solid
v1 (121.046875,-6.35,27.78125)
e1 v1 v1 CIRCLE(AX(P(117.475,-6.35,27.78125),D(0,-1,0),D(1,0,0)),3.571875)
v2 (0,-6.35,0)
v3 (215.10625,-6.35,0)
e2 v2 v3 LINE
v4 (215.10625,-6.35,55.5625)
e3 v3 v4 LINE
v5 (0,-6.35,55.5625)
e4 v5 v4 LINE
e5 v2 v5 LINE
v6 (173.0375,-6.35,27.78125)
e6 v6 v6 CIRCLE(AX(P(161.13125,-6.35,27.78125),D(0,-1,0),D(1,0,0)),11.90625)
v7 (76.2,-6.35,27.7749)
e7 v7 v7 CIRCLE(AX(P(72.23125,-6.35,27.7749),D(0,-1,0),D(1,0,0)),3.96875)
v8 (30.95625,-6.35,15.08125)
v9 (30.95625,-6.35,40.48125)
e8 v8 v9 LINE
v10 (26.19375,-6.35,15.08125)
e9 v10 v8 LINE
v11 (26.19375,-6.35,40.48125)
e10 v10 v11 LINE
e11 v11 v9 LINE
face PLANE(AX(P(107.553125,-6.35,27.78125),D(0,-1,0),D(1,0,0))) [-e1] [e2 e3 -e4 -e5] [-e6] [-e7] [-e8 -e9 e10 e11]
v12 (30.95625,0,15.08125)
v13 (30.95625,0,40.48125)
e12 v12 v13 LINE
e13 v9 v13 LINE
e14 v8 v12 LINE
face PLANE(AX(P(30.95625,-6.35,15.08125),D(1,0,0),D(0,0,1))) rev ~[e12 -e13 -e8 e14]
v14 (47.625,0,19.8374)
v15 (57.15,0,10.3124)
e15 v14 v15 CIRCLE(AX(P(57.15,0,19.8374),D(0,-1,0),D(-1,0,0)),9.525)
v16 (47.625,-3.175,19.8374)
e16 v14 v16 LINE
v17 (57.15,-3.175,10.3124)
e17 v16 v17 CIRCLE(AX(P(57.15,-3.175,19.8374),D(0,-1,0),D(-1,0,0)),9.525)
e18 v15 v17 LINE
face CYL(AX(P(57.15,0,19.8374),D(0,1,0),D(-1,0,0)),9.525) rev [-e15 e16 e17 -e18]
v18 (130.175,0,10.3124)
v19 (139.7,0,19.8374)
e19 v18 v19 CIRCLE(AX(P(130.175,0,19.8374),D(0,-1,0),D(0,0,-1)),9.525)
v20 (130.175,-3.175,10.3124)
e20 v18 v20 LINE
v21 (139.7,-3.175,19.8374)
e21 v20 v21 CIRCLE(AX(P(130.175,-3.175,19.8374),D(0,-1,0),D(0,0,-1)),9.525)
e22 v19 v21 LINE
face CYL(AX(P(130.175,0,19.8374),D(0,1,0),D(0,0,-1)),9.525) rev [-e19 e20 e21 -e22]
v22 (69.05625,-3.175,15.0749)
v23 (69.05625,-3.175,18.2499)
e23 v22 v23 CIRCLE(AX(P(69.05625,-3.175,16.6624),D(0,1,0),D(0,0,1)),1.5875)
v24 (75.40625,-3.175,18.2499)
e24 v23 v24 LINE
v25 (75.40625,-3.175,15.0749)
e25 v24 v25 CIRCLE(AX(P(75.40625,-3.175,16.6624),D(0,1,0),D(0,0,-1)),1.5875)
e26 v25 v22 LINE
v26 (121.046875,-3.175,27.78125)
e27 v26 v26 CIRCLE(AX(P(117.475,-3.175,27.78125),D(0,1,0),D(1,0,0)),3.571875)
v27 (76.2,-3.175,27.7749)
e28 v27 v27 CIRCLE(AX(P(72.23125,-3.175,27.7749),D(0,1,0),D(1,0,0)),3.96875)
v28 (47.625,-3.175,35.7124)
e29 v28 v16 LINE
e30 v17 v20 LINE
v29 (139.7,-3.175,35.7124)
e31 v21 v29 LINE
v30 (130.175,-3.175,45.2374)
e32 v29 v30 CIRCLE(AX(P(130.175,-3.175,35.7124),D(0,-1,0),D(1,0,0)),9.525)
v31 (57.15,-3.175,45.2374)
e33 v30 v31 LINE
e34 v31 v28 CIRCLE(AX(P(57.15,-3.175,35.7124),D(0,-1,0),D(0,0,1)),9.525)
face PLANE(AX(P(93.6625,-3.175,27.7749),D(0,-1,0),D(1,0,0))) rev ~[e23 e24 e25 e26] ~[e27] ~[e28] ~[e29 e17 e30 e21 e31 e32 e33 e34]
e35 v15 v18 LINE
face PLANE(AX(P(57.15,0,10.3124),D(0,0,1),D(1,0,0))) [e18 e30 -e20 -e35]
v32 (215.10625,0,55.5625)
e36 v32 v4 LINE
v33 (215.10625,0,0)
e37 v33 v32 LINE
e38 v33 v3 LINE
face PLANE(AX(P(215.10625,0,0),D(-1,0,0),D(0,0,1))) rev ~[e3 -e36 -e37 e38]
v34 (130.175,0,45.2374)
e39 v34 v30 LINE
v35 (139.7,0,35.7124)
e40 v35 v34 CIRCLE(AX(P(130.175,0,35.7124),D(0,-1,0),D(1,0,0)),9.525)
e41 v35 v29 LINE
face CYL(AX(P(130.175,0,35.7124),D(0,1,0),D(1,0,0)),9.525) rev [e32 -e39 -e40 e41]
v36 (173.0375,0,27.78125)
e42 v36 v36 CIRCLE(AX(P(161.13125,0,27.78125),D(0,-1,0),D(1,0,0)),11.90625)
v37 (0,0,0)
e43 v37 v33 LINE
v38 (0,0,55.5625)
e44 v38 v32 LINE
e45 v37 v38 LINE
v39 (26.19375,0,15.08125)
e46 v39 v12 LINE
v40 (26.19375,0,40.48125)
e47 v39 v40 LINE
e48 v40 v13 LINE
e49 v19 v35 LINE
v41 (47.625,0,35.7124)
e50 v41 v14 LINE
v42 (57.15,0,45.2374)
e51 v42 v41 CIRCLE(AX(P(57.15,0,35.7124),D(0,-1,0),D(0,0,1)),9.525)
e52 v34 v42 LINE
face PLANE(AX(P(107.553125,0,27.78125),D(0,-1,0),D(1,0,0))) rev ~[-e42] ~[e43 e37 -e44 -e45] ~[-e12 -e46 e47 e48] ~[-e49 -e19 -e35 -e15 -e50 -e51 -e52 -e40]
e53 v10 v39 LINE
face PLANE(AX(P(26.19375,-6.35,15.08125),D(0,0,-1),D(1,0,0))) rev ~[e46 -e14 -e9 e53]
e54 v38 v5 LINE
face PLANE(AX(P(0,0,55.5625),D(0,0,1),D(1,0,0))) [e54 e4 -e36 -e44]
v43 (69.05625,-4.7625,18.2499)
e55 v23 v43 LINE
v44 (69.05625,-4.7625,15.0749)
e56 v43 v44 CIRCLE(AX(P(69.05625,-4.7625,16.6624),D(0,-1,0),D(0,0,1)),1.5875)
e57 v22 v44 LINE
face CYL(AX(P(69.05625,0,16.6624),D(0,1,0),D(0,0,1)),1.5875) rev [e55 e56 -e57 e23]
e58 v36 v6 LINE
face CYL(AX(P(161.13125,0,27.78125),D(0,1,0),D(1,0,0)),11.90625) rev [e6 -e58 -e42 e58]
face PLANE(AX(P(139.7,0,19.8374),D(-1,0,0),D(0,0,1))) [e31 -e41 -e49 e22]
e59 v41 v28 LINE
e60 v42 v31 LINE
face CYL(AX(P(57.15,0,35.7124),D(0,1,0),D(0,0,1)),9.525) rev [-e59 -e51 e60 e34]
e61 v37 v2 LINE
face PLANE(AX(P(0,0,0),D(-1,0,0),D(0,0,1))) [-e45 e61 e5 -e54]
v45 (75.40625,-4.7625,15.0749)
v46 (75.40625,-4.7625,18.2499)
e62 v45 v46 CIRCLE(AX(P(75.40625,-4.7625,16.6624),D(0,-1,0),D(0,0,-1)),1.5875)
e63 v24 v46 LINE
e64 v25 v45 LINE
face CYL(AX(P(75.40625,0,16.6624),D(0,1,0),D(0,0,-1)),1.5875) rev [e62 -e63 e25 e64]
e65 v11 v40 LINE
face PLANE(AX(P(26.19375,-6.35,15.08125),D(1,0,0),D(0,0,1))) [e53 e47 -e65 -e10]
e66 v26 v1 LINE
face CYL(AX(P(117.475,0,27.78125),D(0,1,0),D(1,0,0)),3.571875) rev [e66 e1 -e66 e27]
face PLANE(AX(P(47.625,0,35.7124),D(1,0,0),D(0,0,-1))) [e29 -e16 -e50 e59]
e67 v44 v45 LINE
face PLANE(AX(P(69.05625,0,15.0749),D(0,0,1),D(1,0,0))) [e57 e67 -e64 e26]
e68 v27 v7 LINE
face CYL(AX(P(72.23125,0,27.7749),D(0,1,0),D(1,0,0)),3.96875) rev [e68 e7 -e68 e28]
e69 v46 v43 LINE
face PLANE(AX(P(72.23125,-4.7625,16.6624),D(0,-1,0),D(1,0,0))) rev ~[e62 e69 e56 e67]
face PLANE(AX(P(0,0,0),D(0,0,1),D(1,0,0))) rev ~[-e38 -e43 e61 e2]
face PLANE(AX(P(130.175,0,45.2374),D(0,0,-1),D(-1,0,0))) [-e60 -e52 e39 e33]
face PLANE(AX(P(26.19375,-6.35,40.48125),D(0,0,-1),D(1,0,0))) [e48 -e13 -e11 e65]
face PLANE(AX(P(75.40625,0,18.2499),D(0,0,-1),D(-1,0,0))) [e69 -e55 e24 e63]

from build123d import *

# Parameters (mm, degrees)
F0_W          = 215.10625
F0_H          = 55.5625
F0_R          = 3.96875
F0_R_2        = 3.571875
F0_R_3        = 11.90625
F1_DEPTH      = 6.35
F2_W          = 4.7625
F2_H          = 25.4
F3_DEPTH      = 332
F3_DEPTH_BACK = 6.351
F5_DEPTH      = 3.175
F7_DEPTH      = 4.7625
F7_DEPTH_BACK = 3.175


# Not quite as in the source:
# - an extrude ends at something that could not be found from the text; its depth is read off the source's solid


with BuildPart() as f1:
    # F0 (on Front) → F1 (new body)
    with BuildSketch(Plane.XZ):
        with Locations((107.553125, 27.78125)):
            Rectangle(F0_W, F0_H)
        with Locations((72.23125, 27.7749)):
            Circle(F0_R, mode=Mode.SUBTRACT)
        with Locations((117.475, 27.78125)):
            Circle(F0_R_2, mode=Mode.SUBTRACT)
        with Locations((161.13125, 27.78125)):
            Circle(F0_R_3, mode=Mode.SUBTRACT)
    extrude(amount=F1_DEPTH)

    # F2 (on face) → F3 (cut, two sides)
    with BuildSketch(Plane.XZ.offset(6.35)) as f3_sk:
        with Locations((28.575, 27.78125)):
            Rectangle(F2_W, F2_H)
    extrude(amount=F3_DEPTH, mode=Mode.SUBTRACT)
    extrude(f3_sk.sketch, amount=-F3_DEPTH_BACK, mode=Mode.SUBTRACT)

    # F4 (on face) → F5 (cut)
    with BuildSketch(Plane.XZ):
        with BuildLine():
            Line((57.15, 10.3124), (130.175, 10.3124))
            ThreePointArc((130.175, 10.3124), (136.9101920908, 13.1022079092), (139.7, 19.8374))
            Line((139.7, 19.8374), (139.7, 35.7124))
            ThreePointArc((139.7, 35.7124), (136.9101920908, 42.4475920908), (130.175, 45.2374))
            Line((130.175, 45.2374), (57.15, 45.2374))
            ThreePointArc((57.15, 45.2374), (50.4148079092, 42.4475920908), (47.625, 35.7124))
            Line((47.625, 35.7124), (47.625, 19.8374))
            ThreePointArc((47.625, 19.8374), (50.4148079092, 13.1022079092), (57.15, 10.3124))
        make_face()
    extrude(amount=F5_DEPTH, mode=Mode.SUBTRACT)

    # F6 (on face) → F7 (cut, two sides)
    with BuildSketch(Plane.XZ) as f7_sk:
        with BuildLine():
            Line((69.05625, 15.0749), (75.40625, 15.0749))
            ThreePointArc((75.40625, 15.0749), (76.99375, 16.6624), (75.40625, 18.2499))
            Line((75.40625, 18.2499), (69.05625, 18.2499))
            ThreePointArc((69.05625, 18.2499), (67.46875, 16.6624), (69.05625, 15.0749))
        make_face()
    extrude(amount=F7_DEPTH, mode=Mode.SUBTRACT)
    extrude(f7_sk.sketch, amount=-F7_DEPTH_BACK, mode=Mode.SUBTRACT)


solid = f1.part
